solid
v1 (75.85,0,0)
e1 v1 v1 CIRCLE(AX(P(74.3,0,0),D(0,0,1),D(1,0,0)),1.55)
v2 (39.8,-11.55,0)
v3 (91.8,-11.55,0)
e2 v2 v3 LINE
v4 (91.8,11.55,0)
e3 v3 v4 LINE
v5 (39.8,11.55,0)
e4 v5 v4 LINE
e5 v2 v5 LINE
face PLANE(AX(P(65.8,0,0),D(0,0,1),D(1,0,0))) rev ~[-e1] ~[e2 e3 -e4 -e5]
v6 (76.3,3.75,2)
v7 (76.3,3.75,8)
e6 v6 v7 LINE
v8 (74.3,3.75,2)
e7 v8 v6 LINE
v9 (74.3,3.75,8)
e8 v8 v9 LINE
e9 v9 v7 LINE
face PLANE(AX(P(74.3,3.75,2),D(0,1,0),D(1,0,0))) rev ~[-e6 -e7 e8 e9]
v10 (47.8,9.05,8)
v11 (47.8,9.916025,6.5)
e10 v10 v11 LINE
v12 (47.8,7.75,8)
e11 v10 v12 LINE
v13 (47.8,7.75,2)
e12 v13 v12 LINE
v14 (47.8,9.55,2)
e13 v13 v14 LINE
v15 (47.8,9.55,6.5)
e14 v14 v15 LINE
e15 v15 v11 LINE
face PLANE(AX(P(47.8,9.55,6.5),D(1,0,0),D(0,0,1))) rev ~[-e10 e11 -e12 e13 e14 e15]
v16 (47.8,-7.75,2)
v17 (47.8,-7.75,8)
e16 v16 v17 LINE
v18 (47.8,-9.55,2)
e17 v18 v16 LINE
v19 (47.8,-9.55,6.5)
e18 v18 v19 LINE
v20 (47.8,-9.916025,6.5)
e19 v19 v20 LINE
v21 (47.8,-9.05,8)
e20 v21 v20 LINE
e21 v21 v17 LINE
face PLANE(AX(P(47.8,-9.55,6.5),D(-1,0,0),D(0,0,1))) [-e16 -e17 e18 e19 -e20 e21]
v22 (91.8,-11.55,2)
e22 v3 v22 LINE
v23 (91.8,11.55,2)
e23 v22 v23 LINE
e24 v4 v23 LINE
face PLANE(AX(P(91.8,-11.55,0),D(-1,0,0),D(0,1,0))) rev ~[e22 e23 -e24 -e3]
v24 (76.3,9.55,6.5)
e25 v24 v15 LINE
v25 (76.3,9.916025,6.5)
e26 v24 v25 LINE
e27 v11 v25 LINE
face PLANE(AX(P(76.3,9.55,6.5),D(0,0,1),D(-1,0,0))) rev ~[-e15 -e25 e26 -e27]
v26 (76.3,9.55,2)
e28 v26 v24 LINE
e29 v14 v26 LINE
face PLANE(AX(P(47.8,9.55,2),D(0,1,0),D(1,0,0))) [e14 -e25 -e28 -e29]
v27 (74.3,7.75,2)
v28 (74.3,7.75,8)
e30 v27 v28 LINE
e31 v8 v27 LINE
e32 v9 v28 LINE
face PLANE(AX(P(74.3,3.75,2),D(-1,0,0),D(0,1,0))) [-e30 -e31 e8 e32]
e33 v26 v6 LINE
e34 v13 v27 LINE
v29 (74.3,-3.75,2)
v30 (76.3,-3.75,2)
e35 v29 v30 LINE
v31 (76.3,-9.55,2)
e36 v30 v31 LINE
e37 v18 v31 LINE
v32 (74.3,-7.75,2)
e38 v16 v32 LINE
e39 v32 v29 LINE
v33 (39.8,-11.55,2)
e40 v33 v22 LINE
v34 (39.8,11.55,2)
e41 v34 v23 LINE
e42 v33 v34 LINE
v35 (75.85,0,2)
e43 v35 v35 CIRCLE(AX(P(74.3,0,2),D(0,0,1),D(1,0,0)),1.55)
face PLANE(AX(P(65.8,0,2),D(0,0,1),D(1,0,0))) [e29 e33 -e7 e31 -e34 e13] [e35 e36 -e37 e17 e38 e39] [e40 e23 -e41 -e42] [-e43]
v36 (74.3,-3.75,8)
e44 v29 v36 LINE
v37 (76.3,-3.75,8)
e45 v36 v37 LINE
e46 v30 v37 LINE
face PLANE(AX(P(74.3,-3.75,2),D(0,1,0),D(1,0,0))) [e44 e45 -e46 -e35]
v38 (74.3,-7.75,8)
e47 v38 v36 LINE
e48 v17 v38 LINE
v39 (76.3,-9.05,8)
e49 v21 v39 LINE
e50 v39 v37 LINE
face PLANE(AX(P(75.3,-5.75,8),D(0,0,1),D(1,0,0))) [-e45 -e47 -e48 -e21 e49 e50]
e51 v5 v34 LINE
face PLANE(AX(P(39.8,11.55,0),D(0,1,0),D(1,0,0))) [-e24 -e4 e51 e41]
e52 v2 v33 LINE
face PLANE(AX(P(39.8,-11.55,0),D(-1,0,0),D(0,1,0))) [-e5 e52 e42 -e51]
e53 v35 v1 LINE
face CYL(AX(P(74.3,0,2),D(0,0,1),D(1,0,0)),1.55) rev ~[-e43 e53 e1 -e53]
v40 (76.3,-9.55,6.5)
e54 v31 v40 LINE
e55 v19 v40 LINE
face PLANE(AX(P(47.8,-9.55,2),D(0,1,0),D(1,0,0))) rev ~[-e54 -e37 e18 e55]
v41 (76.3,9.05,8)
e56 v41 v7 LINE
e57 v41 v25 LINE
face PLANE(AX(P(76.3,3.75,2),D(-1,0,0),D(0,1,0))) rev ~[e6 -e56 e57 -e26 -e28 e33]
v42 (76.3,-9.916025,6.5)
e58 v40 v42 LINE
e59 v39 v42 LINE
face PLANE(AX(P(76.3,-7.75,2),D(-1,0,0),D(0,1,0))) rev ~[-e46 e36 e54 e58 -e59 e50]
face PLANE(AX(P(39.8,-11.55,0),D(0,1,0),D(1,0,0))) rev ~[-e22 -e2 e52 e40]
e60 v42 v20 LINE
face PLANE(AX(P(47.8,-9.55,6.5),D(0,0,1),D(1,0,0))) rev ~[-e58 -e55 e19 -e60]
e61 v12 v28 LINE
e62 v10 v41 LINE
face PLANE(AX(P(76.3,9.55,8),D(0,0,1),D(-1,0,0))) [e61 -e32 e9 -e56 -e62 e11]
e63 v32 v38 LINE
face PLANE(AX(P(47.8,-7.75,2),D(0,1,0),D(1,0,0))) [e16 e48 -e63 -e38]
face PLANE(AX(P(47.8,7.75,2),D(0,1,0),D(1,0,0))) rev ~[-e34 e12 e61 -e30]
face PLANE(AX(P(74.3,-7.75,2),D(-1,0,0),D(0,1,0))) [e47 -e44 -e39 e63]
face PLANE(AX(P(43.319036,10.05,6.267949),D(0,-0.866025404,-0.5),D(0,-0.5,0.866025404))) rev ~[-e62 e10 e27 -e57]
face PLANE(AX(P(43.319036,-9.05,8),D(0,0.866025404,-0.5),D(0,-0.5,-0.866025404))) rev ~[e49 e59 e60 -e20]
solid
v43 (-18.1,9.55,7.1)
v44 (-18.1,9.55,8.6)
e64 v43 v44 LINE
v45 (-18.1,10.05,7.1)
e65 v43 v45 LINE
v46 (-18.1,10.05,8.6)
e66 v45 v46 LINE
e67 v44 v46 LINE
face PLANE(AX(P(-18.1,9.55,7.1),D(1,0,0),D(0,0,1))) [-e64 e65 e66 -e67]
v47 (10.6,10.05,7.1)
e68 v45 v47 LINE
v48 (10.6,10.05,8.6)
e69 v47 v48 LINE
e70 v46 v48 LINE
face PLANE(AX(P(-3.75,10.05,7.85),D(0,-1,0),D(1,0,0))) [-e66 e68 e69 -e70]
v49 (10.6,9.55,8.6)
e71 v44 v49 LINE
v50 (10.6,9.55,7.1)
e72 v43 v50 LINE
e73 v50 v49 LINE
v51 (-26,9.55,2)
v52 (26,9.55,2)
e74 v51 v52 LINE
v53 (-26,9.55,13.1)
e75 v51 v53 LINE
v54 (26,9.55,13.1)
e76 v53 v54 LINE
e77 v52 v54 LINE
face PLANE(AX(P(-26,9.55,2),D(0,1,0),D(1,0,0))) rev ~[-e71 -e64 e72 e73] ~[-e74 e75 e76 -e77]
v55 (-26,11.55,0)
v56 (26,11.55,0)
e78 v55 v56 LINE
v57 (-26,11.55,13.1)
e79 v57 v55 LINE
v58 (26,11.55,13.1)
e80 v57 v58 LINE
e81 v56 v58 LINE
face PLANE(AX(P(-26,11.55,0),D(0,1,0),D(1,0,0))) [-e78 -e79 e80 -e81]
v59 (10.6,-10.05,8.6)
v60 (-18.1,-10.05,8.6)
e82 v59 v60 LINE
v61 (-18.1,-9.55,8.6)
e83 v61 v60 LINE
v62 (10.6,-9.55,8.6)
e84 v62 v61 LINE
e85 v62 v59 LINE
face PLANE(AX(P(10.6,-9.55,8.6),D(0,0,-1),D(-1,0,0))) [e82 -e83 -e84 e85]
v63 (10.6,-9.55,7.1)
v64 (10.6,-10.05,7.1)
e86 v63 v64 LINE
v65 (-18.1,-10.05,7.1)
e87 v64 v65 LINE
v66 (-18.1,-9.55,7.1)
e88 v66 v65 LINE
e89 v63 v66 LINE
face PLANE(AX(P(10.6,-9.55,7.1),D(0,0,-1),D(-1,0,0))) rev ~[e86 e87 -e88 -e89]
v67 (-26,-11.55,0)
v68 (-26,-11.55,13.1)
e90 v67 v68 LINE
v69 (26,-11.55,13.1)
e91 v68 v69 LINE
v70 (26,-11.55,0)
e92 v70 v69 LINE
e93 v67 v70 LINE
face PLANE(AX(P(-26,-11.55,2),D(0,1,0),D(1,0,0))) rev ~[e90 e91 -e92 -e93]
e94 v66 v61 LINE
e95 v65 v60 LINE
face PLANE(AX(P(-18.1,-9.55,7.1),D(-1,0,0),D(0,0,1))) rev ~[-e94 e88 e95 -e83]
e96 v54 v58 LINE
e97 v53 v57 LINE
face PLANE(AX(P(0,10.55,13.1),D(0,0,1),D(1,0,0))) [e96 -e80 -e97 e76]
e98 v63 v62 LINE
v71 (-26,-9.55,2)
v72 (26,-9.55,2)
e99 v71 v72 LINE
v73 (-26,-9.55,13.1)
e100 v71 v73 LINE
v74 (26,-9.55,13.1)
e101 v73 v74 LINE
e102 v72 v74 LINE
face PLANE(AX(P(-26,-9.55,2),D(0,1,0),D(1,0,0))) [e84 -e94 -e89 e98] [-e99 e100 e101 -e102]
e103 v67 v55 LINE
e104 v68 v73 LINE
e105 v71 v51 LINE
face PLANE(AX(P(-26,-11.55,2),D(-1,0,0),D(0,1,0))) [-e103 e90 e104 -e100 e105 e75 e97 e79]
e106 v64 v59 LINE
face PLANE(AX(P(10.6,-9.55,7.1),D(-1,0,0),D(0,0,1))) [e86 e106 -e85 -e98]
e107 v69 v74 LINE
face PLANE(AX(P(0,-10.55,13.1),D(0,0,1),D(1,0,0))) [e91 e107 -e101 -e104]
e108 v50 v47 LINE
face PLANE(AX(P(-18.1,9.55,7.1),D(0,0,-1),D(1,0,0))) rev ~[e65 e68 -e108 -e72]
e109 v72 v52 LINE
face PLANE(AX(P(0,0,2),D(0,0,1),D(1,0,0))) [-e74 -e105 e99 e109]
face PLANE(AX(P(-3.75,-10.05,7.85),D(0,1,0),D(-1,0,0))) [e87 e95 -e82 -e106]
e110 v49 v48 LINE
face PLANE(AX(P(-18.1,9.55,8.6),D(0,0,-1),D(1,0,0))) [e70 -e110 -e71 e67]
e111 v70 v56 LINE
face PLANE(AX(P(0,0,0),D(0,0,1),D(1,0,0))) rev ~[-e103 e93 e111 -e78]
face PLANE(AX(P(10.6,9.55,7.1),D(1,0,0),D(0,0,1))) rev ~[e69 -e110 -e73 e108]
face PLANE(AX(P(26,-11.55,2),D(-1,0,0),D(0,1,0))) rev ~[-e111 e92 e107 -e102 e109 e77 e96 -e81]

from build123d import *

# Parameters (mm, degrees)
F0_W         = 52
F0_H         = 23.1
F1_DEPTH     = 2
F3_W         = 52
F3_H         = 2
F4_DEPTH     = 11.1
F5_W         = 28.5
F5_H         = 1.8
F6_DEPTH     = 6
F7_W         = 28.5
F7_H         = 1.5
F8_DEPTH     = 0.5
F9_T1_DEPTH  = 37.4619279412
F10_W        = 28.5
F10_H        = 1.5
F11_DEPTH    = 0.5
F12_T1_DEPTH = 37.4619279412
F13_W        = 28.7
F13_H        = 1.5
F14_DEPTH    = 0.5
F15_W        = 28.7
F15_H        = 1.5
F16_DEPTH    = 0.5
F17_R        = 1.55
F18_DEPTH    = 2.001
F19_W        = 2
F19_H        = 4
F20_DEPTH    = 6


# Not quite as in the source:
# - a fillet or chamfer that OpenCascade refuses, or shapes differently, is made with other operations: its cross-section is extruded or revolved along the edge and cut away or added


with BuildPart() as f1:
    # F0 (on Top) → F1 (new body)
    with BuildSketch(Plane.XY):
        Rectangle(F0_W, F0_H)
    extrude(amount=F1_DEPTH)


with BuildPart() as f2_1:
    # F2: copy of F1
    add(f1.part.moved(Location((65.8, 0, 0))))

    # F5 (on face) → F6 (join)
    with BuildSketch(Plane.XY.offset(2)):
        with Locations((62.05, -8.65)):
            Rectangle(F5_W, F5_H)
        with Locations((62.05, 8.65)):
            Rectangle(F5_W, F5_H)
    extrude(amount=F6_DEPTH)

    # F7 (on face) → F8 (join)
    with BuildSketch(Plane.XZ.offset(9.55)):
        with Locations((62.05, 7.25)):
            Rectangle(F7_W, F7_H)
    extrude(amount=F8_DEPTH)

    # F9: chamfer of 1 x 1.7320508076 on 1 edges, made by hand

    # F9_s2 → F9_t1 (cut)
    with BuildSketch(Plane.YZ.offset(43.3190360294)):
        Polygon((-9.05, 8), (-10.05, 6.2679491924), (-10.05, 8), align=None)
    extrude(amount=F9_T1_DEPTH, mode=Mode.SUBTRACT)

    # F10 (on face) → F11 (join)
    with BuildSketch(Plane(origin=(0, 9.55, 0), x_dir=(-1, 0, 0), z_dir=(0, 1, 0))):
        with Locations((-62.05, 7.25)):
            Rectangle(F10_W, F10_H)
    extrude(amount=F11_DEPTH)

    # F12: chamfer of 1 x 1.7320508076 on 1 edges, made by hand

    # F12_s2 → F12_t1 (cut)
    with BuildSketch(Plane.YZ.offset(43.3190360294)):
        Polygon((10.05, 6.2679491924), (9.05, 8), (10.05, 8), align=None)
    extrude(amount=F12_T1_DEPTH, mode=Mode.SUBTRACT)

    # F17 (on face) → F18 (cut, through all)
    with BuildSketch(Plane.XY.offset(2)):
        with Locations((74.3, 0)):
            Circle(F17_R)
    extrude(amount=-F18_DEPTH, mode=Mode.SUBTRACT)

    # F19 (on face) → F20 (join)
    with BuildSketch(Plane.XY.offset(2)):
        with Locations((75.3, -5.75)):
            Rectangle(F19_W, F19_H)
        with Locations((75.3, 5.75)):
            Rectangle(F19_W, F19_H)
    extrude(amount=F20_DEPTH)


with BuildPart() as f1_1:
    add(f1.part)

    # F3 (on face) → F4 (join)
    with BuildSketch(Plane.XY.offset(2)):
        with Locations((0, -10.55)):
            Rectangle(F3_W, F3_H)
        with Locations((0, 10.55)):
            Rectangle(F3_W, F3_H)
    extrude(amount=F4_DEPTH)

    # F13 (on face) → F14 (cut)
    with BuildSketch(Plane(origin=(0, -9.55, 0), x_dir=(-1, 0, 0), z_dir=(0, 1, 0))):
        with Locations((3.75, 7.85)):
            Rectangle(F13_W, F13_H)
    extrude(amount=-F14_DEPTH, mode=Mode.SUBTRACT)

    # F15 (on face) → F16 (cut)
    with BuildSketch(Plane.XZ.offset(-9.55)):
        with Locations((-3.75, 7.85)):
            Rectangle(F15_W, F15_H)
    extrude(amount=-F16_DEPTH, mode=Mode.SUBTRACT)


solid = Compound([f2_1.part, f1_1.part])
